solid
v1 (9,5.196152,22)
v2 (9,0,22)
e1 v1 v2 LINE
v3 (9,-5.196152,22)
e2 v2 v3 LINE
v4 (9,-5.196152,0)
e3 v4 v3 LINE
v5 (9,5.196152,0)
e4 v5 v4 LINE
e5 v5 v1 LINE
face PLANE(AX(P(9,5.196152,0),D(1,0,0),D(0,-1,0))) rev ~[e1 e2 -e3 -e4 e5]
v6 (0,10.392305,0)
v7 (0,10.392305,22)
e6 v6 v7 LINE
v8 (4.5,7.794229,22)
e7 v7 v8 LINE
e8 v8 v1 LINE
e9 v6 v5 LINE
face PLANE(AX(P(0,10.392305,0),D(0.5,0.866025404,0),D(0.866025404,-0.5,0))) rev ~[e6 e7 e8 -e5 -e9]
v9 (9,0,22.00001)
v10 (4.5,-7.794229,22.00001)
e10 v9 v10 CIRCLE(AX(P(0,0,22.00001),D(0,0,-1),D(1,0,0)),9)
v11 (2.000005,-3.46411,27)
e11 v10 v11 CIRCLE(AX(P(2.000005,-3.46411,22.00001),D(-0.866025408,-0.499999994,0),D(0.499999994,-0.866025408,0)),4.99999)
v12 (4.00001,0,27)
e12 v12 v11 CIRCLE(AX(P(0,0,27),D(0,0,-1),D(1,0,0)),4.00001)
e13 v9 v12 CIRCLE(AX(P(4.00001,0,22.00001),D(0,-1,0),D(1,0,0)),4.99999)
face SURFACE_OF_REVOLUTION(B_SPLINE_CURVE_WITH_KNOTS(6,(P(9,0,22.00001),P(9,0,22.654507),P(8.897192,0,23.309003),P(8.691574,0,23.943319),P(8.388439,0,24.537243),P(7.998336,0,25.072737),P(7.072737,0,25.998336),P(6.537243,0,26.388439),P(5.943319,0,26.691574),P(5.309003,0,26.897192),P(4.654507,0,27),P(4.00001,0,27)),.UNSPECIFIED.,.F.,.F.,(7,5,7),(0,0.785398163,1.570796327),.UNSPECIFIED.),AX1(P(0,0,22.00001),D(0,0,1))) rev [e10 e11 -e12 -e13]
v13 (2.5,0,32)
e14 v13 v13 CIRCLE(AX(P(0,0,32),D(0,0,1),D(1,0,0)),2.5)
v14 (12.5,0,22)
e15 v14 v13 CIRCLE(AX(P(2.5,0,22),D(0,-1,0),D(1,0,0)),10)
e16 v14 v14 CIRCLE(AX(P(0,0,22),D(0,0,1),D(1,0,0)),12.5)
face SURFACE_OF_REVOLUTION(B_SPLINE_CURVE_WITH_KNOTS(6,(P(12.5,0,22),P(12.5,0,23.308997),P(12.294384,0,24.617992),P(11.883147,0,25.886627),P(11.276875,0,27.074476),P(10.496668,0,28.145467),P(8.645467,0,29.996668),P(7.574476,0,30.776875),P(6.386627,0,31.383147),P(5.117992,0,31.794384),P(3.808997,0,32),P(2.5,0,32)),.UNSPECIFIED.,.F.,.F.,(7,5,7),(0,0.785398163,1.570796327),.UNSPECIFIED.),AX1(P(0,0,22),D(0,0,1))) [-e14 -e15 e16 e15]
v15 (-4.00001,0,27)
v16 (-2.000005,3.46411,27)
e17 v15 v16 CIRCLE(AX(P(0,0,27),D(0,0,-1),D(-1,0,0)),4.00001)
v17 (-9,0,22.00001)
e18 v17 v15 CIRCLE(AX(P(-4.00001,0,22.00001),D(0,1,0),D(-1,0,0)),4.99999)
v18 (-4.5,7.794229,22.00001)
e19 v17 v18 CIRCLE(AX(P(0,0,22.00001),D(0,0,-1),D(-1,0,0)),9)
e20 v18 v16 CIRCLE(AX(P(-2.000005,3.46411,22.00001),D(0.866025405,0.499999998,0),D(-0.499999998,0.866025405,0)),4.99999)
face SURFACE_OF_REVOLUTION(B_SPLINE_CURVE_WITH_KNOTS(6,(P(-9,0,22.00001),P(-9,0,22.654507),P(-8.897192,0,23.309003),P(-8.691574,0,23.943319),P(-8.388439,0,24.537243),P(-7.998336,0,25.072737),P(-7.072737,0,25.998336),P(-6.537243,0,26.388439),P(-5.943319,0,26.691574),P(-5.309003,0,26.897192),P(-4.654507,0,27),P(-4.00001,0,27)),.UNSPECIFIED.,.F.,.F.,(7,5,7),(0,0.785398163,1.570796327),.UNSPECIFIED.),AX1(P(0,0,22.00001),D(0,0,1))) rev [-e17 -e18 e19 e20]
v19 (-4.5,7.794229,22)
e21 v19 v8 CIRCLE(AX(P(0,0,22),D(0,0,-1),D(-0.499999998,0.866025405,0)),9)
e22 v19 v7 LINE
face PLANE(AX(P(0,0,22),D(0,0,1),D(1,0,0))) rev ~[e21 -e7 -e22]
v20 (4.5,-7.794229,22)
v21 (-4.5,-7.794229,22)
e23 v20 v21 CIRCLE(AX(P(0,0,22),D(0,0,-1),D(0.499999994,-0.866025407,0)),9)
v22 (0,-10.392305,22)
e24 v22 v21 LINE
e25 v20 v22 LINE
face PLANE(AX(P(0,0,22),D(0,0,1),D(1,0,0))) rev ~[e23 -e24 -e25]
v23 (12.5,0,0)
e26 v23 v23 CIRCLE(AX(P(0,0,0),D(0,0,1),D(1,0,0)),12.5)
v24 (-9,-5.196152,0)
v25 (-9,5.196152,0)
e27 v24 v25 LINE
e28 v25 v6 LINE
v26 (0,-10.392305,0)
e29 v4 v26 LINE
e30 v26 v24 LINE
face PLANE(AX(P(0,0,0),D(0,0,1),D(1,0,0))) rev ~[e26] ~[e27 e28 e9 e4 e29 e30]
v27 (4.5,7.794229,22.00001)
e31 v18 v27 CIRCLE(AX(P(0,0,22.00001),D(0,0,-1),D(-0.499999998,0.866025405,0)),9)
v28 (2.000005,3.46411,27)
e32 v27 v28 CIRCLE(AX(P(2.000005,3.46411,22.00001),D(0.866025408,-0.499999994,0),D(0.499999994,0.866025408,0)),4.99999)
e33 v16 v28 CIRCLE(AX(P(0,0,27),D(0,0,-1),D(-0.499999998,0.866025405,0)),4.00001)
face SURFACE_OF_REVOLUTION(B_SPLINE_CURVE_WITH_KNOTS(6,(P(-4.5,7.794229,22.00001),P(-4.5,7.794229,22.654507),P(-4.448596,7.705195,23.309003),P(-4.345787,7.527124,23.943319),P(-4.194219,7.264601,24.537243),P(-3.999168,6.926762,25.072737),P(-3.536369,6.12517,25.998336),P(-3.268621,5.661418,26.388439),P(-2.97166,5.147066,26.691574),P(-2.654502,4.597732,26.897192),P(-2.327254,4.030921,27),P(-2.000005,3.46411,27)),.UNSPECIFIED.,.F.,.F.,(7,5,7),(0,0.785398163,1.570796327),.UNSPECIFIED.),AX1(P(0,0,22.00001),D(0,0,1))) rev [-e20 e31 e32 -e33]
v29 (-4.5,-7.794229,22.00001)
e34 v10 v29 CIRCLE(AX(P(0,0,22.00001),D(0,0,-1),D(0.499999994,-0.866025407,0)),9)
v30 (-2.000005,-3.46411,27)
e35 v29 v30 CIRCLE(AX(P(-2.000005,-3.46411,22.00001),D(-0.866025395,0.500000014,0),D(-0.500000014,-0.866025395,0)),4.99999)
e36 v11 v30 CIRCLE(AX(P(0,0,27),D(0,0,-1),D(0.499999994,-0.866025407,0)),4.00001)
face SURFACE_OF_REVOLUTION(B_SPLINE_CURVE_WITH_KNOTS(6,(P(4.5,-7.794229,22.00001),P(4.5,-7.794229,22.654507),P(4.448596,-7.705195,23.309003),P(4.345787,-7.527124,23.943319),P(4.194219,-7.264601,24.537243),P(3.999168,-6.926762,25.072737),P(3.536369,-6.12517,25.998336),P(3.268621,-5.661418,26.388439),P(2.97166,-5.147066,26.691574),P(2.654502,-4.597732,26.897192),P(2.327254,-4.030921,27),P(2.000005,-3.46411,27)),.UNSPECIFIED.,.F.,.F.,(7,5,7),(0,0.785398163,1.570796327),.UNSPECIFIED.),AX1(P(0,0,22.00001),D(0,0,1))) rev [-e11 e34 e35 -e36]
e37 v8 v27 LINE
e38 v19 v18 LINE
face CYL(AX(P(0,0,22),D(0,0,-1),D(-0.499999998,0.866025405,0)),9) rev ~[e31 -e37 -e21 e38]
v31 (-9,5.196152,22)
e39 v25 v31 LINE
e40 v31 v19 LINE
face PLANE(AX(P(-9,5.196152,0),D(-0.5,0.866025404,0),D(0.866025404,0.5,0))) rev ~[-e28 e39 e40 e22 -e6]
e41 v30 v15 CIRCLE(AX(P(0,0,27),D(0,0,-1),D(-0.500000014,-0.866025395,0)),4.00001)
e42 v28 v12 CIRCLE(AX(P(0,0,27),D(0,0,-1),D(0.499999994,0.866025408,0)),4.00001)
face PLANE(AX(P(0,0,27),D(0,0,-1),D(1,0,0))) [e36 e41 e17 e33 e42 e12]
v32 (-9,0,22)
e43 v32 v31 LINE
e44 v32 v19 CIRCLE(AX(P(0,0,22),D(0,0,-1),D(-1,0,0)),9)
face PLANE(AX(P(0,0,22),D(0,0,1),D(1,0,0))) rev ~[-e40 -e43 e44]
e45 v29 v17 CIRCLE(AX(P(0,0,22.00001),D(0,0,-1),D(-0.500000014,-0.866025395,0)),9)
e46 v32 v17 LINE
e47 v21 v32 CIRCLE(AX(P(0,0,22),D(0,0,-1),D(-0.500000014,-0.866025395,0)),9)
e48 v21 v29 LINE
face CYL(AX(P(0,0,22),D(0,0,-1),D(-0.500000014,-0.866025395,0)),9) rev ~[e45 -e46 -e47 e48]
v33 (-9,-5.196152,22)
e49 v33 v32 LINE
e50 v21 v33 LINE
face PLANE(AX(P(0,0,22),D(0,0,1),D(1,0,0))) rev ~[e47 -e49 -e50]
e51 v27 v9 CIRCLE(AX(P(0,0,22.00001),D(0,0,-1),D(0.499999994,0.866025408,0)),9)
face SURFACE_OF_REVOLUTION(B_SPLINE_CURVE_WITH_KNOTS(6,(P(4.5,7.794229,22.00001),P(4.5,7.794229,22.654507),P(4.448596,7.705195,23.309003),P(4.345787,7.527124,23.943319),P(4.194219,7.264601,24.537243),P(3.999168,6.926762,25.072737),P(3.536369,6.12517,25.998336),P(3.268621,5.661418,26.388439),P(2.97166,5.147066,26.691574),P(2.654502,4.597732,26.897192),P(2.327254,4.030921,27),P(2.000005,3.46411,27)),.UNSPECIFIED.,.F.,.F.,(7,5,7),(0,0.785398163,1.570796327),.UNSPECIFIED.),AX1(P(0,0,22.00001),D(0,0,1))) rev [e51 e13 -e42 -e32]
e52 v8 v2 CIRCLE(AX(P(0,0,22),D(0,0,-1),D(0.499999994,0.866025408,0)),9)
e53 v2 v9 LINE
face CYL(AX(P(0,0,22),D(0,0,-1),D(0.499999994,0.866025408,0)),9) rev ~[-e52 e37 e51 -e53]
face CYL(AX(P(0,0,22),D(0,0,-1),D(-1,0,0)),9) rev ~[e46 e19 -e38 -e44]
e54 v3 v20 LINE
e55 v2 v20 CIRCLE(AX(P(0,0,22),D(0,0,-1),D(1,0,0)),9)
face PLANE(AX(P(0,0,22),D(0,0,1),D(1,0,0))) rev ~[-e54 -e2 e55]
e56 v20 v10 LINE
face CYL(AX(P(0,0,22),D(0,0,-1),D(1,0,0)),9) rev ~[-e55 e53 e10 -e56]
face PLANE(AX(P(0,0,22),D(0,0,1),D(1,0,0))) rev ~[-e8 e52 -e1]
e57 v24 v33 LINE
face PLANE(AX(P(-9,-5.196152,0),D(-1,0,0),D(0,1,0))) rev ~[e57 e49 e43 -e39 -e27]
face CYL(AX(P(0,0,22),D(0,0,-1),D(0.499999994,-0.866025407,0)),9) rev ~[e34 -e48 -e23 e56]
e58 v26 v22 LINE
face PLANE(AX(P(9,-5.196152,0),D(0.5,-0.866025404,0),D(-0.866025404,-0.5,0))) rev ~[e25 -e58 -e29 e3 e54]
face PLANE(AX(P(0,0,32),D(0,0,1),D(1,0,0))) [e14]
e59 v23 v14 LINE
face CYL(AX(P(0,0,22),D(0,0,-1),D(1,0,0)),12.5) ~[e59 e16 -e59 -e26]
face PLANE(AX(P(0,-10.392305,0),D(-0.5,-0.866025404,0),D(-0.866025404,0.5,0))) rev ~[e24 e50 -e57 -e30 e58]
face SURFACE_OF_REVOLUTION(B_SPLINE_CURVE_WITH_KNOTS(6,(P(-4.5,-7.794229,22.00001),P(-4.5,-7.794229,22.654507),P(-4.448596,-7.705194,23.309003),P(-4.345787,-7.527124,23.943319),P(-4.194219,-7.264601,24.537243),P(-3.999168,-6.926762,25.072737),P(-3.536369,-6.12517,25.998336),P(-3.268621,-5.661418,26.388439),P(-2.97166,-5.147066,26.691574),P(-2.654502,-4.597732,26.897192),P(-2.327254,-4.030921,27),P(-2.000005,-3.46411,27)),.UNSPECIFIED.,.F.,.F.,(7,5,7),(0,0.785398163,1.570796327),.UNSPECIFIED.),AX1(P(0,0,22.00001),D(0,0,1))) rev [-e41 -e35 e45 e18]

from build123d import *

# Parameters (mm, degrees)
F0_R     = 12.5
F1_DEPTH = 22
F3_DEPTH = 22
F4_R     = 12.5
F5_DEPTH = 10
F6_R     = 10
F8_DEPTH = 5
F9_R     = 4.99999


# Not quite as in the source:
# - a fillet or chamfer is up to 0.001 mm smaller than in the source, because OpenCascade refuses the exact size


with BuildPart() as f1:
    # F0 (on Top) → F1 (new body)
    with BuildSketch(Plane.XY):
        Circle(F0_R)
    extrude(amount=F1_DEPTH)

    # F2 (on face) → F3 (cut, through all)
    with BuildSketch(Plane(origin=(0, 0, 0), x_dir=(1, 0, 0), z_dir=(0, 0, -1))):
        Polygon((9, -5.1961524227), (9, 5.1961524227), (0, 10.3923048454), (-9, 5.1961524227), (-9, -5.1961524227), (0, -10.3923048454), align=None)
    extrude(amount=-F3_DEPTH, mode=Mode.SUBTRACT)

    # F4 (on face) → F5 (join)
    with BuildSketch(Plane.XY.offset(22)):
        Circle(F4_R)
    extrude(amount=F5_DEPTH)

    # F6
    f6_edges = [f1.edges().sort_by_distance(p)[0] for p in [
        (-12.5, 0, 32),
    ]]
    fillet(f6_edges, radius=F6_R)

    # F7 (on face) → F8 (cut)
    with BuildSketch(Plane(origin=(0, 0, 22), x_dir=(1, 0, 0), z_dir=(0, 0, -1))):
        with BuildLine():
            ThreePointArc((4.499999942, -7.7942286675), (7.7942286173, -4.500000029), (9, 0))
            ThreePointArc((9, 0), (7.7942286173, 4.500000029), (4.499999942, 7.7942286675))
            ThreePointArc((4.499999942, 7.7942286675), (-1.087e-07, 9), (-4.5000001303, 7.7942285588))
            ThreePointArc((-4.5000001303, 7.7942285588), (-7.7942286717, 4.4999999349), (-9, 0))
            ThreePointArc((-9, 0), (-7.7942286277, -4.500000011), (-4.499999978, -7.7942286468))
            ThreePointArc((-4.499999978, -7.7942286468), (-2.08e-08, -9), (4.499999942, -7.7942286675))
        make_face()
    extrude(amount=-F8_DEPTH, mode=Mode.SUBTRACT)

    # F9 (radius 5 in the source; OpenCascade refuses exactly that, so slightly less here)
    f9_edges = [f1.edges().sort_by_distance(p)[0] for p in [
        (-4.5, 7.794229, 27),
    ]]
    fillet(f9_edges, radius=F9_R)


solid = f1.part
